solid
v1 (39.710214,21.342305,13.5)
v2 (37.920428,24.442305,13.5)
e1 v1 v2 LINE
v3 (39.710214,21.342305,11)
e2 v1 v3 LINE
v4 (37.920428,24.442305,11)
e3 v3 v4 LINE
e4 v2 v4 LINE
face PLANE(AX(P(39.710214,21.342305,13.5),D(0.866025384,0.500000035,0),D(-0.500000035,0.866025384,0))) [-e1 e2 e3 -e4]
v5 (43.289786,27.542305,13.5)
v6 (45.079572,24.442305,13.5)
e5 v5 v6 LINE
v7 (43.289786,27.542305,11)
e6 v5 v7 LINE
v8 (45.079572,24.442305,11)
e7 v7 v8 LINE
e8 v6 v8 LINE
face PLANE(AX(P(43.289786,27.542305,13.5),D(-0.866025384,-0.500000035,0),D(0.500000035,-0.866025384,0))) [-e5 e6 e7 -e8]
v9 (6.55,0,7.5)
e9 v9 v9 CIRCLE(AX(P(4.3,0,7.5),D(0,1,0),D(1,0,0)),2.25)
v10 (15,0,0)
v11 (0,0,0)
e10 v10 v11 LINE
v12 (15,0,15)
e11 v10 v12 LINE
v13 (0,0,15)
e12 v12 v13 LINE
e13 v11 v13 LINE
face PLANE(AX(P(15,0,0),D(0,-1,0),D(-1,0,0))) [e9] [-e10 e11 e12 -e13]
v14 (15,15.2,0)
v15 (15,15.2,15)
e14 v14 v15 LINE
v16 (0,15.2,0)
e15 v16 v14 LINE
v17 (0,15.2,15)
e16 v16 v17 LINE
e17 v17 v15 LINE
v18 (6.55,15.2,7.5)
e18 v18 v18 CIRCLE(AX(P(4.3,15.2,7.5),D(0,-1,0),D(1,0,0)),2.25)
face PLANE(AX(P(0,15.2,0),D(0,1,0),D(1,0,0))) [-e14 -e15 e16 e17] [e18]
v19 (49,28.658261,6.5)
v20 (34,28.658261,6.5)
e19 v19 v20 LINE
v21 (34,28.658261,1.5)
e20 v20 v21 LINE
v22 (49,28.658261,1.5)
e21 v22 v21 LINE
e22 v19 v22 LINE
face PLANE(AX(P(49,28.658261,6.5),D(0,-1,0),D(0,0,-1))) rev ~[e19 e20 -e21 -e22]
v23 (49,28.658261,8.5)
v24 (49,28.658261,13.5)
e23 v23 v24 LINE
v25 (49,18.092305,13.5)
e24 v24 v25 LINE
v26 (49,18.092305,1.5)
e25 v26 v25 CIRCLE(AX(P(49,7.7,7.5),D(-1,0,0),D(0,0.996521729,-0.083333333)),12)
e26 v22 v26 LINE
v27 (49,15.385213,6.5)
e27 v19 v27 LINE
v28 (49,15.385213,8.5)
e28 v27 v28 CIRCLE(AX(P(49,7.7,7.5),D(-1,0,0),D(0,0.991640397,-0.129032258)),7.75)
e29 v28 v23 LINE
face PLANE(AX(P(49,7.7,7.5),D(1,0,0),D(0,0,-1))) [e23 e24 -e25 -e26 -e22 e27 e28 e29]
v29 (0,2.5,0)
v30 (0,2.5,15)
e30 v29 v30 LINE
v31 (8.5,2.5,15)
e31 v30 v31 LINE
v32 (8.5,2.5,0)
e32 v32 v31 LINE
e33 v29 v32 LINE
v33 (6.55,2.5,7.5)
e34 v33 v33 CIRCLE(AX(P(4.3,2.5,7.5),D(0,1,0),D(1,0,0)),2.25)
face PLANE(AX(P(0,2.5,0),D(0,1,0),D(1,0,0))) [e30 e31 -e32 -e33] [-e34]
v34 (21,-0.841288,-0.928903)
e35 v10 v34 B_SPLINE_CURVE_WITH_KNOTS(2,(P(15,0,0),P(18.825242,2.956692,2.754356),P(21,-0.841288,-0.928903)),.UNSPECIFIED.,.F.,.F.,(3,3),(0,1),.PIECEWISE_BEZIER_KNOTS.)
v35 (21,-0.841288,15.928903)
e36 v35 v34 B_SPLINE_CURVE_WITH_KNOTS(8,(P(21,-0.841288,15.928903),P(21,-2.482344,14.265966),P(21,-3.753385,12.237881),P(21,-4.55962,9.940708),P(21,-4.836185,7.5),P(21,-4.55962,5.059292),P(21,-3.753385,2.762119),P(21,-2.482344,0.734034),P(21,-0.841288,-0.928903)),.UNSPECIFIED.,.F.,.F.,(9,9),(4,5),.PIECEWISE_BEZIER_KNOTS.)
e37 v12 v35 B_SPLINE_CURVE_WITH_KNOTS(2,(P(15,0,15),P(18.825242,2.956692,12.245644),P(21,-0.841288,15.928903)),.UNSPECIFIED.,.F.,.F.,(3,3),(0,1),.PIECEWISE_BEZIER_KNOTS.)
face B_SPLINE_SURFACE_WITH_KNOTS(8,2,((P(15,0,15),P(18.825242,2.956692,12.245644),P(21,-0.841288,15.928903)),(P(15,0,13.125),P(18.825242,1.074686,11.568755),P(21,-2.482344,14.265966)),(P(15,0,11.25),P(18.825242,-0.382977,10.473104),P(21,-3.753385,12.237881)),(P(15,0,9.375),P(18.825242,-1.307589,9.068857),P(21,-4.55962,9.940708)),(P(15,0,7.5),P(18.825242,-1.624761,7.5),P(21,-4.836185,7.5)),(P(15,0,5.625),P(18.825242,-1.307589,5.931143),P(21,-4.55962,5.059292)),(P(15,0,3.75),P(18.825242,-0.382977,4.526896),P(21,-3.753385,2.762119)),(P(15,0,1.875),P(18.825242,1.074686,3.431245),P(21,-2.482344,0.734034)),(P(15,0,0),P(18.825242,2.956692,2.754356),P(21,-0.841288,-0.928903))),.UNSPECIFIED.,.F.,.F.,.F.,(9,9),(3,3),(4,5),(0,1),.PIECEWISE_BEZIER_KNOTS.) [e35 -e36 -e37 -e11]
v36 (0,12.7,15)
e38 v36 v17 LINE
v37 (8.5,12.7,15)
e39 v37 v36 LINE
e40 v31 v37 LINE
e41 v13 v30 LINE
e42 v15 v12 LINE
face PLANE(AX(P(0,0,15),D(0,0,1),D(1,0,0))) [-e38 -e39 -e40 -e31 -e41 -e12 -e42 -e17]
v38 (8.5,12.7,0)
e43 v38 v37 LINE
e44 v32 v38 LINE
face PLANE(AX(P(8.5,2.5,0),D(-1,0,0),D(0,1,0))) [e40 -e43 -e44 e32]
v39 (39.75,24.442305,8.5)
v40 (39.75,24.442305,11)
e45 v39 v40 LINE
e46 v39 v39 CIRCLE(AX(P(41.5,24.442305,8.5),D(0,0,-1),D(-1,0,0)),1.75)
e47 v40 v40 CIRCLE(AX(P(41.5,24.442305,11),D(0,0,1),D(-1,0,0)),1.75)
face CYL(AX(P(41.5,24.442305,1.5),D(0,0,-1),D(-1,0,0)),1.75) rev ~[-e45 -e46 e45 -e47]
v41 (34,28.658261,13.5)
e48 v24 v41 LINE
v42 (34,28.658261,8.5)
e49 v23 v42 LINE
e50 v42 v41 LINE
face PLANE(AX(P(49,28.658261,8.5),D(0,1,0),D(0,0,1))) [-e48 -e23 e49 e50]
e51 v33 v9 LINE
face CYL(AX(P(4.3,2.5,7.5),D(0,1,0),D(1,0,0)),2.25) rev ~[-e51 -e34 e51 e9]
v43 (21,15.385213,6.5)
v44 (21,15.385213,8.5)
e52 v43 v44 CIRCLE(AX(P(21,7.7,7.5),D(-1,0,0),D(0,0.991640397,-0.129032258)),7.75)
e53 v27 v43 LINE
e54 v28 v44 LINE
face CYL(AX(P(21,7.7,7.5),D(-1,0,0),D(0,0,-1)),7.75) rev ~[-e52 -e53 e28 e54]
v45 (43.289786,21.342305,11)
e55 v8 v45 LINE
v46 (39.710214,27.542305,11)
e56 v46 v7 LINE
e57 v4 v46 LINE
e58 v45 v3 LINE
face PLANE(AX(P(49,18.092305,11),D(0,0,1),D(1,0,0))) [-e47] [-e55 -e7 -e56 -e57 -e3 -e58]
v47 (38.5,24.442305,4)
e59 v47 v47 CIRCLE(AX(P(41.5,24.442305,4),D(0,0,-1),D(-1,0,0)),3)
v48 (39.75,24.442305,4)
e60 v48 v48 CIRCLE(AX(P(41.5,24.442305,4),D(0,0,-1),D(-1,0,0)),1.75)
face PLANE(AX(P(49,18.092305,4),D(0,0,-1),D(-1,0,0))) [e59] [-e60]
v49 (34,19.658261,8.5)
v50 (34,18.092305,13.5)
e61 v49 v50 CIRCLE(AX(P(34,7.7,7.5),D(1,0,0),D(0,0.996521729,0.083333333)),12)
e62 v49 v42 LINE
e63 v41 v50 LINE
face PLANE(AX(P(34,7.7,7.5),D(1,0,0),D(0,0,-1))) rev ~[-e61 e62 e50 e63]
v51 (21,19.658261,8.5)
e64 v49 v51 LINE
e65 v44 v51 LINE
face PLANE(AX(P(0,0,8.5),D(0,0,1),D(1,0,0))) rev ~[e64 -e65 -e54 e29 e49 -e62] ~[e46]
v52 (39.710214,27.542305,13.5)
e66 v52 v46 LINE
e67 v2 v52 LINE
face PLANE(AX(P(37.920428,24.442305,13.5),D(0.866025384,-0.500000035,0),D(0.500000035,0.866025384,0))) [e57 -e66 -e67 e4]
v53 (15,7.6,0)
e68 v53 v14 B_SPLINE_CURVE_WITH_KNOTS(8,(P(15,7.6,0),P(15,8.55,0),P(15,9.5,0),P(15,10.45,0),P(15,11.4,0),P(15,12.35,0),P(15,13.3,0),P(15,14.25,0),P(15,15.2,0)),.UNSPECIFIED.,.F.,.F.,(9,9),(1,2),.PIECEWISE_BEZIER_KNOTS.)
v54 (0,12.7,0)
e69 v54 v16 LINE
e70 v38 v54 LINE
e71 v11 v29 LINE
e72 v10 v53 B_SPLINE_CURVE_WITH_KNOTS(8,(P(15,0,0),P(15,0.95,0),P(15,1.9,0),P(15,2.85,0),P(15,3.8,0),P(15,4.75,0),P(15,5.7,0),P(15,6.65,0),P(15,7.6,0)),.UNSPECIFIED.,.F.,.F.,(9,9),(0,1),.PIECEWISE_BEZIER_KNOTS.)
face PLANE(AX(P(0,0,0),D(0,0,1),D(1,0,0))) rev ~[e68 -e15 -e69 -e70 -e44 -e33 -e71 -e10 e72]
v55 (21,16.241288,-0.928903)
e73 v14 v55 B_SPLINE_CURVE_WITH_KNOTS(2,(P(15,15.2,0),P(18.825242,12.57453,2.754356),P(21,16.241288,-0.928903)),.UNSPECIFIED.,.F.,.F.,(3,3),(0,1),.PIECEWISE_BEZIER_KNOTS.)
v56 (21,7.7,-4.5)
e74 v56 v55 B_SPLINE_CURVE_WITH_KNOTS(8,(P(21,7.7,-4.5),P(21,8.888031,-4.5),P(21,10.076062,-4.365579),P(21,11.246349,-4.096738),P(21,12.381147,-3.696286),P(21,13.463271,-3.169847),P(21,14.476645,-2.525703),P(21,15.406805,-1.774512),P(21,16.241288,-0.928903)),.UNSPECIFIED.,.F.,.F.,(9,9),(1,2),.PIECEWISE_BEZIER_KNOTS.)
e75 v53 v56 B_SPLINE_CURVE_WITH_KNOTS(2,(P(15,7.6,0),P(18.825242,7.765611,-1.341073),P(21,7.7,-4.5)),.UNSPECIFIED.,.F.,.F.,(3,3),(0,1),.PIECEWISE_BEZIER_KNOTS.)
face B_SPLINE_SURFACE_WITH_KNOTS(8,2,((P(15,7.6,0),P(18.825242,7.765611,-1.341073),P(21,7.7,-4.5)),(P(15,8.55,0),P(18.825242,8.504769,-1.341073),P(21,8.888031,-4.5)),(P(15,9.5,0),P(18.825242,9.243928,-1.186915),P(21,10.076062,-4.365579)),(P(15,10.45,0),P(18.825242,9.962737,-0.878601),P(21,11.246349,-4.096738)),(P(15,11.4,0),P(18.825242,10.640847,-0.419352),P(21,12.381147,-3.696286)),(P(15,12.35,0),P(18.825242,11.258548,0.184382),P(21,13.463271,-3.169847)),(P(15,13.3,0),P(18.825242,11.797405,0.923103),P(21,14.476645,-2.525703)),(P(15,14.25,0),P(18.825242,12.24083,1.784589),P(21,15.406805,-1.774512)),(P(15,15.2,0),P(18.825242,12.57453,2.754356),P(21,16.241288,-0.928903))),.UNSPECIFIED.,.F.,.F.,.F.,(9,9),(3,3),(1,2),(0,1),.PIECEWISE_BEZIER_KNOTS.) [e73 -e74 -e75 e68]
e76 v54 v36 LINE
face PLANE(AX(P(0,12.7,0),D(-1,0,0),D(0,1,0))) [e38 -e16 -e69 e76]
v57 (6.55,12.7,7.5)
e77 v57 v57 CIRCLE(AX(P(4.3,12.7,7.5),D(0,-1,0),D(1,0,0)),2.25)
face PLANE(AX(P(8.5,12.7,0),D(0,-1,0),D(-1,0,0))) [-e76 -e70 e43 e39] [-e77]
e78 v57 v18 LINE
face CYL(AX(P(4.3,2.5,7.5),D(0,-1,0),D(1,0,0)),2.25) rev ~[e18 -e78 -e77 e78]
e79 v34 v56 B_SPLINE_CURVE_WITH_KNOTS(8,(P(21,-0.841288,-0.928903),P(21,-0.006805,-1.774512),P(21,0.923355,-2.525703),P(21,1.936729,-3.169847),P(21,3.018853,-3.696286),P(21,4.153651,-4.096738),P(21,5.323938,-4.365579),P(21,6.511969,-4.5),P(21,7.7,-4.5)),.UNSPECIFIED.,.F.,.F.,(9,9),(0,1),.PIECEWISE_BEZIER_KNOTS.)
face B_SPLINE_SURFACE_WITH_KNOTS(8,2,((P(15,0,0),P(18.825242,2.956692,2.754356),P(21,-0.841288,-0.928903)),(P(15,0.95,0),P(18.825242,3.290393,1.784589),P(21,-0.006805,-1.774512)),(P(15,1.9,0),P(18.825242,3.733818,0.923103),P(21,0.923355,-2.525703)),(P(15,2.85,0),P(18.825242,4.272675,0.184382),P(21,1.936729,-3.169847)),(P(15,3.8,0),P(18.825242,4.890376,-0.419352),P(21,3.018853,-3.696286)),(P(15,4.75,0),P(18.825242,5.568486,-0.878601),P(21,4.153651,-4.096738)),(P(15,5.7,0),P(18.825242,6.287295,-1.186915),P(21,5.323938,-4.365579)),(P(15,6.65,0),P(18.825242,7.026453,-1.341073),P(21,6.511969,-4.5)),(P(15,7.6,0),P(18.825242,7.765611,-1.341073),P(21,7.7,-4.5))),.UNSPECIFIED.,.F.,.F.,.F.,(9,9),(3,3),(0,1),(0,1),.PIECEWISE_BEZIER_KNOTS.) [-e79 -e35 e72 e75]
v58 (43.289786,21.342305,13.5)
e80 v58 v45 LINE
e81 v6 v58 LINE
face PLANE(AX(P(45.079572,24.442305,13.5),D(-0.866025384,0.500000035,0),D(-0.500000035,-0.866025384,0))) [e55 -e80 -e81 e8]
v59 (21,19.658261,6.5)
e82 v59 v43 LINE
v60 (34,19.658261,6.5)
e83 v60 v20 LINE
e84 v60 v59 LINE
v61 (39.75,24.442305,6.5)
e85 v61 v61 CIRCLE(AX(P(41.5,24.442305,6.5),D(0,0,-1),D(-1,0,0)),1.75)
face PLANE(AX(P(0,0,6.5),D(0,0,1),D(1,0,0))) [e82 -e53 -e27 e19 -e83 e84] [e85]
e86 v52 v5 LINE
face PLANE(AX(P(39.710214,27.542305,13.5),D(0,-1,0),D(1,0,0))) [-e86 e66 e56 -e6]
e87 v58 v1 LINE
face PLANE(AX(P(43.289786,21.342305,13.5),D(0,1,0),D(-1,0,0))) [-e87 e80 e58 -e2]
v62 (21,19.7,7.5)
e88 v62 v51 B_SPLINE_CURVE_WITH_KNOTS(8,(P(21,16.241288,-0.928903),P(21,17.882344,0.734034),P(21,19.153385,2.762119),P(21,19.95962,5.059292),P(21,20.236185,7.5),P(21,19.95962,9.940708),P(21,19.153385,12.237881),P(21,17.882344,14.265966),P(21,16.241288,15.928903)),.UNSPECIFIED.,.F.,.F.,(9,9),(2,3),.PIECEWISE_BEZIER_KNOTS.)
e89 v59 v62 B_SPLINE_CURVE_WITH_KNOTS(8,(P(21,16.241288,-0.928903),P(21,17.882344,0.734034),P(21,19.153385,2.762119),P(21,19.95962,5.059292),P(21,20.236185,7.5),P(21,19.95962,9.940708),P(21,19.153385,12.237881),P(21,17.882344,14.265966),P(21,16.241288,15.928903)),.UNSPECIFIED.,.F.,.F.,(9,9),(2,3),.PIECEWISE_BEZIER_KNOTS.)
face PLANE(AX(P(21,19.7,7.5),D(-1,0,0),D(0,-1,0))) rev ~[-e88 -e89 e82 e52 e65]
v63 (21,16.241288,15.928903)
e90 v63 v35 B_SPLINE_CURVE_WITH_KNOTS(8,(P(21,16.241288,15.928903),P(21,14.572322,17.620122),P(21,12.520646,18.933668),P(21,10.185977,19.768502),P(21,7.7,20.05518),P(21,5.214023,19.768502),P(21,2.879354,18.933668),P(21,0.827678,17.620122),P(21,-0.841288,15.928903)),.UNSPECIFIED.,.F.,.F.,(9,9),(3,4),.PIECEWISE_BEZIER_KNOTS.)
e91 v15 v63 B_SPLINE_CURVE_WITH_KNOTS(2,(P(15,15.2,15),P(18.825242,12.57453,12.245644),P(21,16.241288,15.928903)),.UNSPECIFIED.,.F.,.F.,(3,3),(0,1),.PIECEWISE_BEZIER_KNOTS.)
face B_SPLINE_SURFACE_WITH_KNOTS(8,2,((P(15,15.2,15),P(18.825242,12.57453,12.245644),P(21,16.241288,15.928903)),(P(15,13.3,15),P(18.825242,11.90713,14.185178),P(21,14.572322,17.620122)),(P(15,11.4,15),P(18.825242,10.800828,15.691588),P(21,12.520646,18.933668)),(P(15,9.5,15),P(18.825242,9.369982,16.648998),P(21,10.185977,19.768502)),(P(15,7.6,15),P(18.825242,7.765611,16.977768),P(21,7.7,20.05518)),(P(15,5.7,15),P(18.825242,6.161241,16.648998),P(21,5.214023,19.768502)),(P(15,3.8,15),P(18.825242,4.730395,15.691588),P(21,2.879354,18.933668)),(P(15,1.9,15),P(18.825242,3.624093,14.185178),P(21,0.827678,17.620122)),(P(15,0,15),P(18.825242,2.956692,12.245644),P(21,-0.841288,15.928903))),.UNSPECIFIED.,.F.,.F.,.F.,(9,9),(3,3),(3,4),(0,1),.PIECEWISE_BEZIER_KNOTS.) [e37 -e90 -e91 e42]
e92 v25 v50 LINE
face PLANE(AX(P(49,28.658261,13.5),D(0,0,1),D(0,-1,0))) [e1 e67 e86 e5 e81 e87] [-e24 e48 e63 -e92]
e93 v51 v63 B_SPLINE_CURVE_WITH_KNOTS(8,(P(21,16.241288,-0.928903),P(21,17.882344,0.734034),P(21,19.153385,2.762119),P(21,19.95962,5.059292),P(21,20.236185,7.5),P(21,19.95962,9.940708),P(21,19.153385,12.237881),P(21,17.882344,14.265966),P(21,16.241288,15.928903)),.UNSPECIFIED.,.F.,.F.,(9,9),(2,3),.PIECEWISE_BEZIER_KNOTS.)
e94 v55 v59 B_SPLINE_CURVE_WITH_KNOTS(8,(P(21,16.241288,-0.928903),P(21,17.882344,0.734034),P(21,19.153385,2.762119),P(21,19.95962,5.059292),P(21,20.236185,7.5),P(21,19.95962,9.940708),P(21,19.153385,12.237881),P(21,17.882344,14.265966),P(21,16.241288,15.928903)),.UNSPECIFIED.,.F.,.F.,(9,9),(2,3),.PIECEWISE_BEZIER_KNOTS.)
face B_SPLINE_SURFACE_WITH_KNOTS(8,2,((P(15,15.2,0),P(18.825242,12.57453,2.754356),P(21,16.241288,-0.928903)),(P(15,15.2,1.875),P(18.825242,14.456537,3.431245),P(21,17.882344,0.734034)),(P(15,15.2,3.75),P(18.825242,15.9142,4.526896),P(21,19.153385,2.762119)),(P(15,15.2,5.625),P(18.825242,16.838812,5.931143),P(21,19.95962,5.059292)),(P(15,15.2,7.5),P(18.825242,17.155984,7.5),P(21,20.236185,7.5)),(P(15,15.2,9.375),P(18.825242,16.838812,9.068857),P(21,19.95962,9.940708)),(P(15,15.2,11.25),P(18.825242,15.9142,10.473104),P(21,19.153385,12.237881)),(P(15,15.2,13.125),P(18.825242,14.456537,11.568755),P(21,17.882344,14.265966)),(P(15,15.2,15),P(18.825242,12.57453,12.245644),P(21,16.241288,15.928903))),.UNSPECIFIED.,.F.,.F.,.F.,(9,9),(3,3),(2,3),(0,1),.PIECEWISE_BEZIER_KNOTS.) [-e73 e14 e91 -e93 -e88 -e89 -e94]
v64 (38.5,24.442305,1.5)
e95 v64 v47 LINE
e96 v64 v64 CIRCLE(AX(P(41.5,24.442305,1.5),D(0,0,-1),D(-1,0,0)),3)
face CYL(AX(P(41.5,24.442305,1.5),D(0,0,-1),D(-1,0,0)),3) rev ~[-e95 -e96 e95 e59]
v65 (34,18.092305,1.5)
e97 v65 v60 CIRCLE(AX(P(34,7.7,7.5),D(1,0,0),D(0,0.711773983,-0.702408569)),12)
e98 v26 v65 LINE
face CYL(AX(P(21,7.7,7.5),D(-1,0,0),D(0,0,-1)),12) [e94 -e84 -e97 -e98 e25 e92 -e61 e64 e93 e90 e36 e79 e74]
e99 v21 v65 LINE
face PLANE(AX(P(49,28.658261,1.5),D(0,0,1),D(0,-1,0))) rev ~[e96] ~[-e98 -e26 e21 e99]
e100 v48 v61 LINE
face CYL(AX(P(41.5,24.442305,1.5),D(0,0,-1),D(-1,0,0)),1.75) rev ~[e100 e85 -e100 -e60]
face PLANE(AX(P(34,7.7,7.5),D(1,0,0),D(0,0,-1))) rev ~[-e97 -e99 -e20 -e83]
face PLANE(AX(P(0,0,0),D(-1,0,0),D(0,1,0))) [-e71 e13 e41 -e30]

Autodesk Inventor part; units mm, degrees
ref_plane "YZ Plane" through (0, 0, 0) normal (1, 0, 0) x (0, 1, 0)
sketch "Sketch1" plane through (0, 0, 0) normal (0, 0, 1) x (1, 0, 0)
  line L0 (0, 0) -> (0, 2.5)
  line L1 (0, 2.5) -> (8.5, 2.5)
  line L2 (8.5, 2.5) -> (8.5, 12.7)
  line L3 (8.5, 12.7) -> (0, 12.7)
  line L4 (0, 12.7) -> (0, 15.2)
  line L5 (0, 15.2) -> (15, 15.2)
  line L6 (15, 15.2) -> (15, 0)
  line L7 (15, 0) -> (0, 0)
  dimension "d0" = 2.5
  dimension "d1" = 8.5
  dimension "d2" = 10.2
  dimension "d3" = 2.5
  dimension "d4" = 15
extrude "Extrusion1" add sketch "Sketch1" along normal blind 15
ref_plane "Work Plane1" through (18, 0, 0) normal (1, 0, 0) x (0, 0, -1)
sketch "Sketch3" plane through (15, 0, 0) normal (1, 0, 0) x (0, 0, -1)
  line L0 (0, 15.2) -> (-15, 15.2) projected
  line L1 (-15, 15.2) -> (0, 15.2)
  line L2 (0, 0) -> (-15, 0) projected
  line L3 (0, 15.2) -> (0, 0)
  line L4 (-15, 2.5) -> (-15, 0) projected
  line L5 (0, 0) -> (-15, 0)
  line L6 (-15, 15.2) -> (-15, 12.7) projected
  line L7 (-15, 0) -> (-15, 15.2)
sketch "Sketch4" plane through (18, 0, 0) normal (1, 0, 0) x (0, 0, -1)
  circle A0 centre (-7.5, 7.7) radius 9
  line L0 (0, 15.2) -> (-15, 15.2) projected
  line L1 (-15, 0) -> (-15, 15.2) projected
  point P0 (0, 0)
  dimension "d10" = 18
  dimension "d11" = 7.5
  dimension "d12" = 7.5
ref_plane "Work Plane2" through (21, 7.7, 7.5) normal (1, 0, 0) x (0, 0, -1)
sketch "Sketch5" plane through (21, 7.7, 7.5) normal (1, 0, 0) x (0, 0, -1)
  circle A0 centre (0, 0) radius 12
  point P0 (7.5, -7.7)
  dimension "d18" = 24
sketch "Sketch4 outline for Loft2" plane through (18, 0, 0) normal (1, 0, 0) x (0, 0, -1)
  circle A0 centre (-7.5, 7.7) radius 9
sketch "Sketch5 outline for Loft2" plane through (21, 7.7, 7.5) normal (1, 0, 0) x (0, 0, -1)
  circle A0 centre (0, 0) radius 12
loft "Loft2" add profiles "Sketch4 outline for Loft2", "Sketch5 outline for Loft2" section 1 edges at (15, 7.6, 0) (15, 15.2, 7.5) (15, 7.6, 15) (15, 0, 7.5)
sketch "Sketch6" plane through (21, 7.7, 7.5) normal (1, 0, 0) x (0, 0, -1)
  circle A0 centre (0, 0) radius 7.75
  circle A1 centre (0, 0) radius 12
  point P0 (7.5, -7.7)
  dimension "d25" = 15.5
extrude "Extrusion2" add sketch "Sketch6" along normal blind 28
ref_plane "Work Plane3" through (0, 0, 7.5) normal (0, 0, 1) x (1, 0, 0)
sketch "Sketch7" plane through (0, 0, 7.5) normal (0, 0, 1) x (1, 0, 0)
  line L0 (21, 19.7) -> (49, 19.7)
  line L1 (49, 19.7) -> (21, 19.7)
  line L2 (21, 16.241288) -> (21, -0.841288)
  line L3 (21, 15.217594) -> (49, 15.217594)
  line L4 (49, -4.3) -> (49, 19.7)
  line L5 (49, 15.217594) -> (49, 19.7)
  line L6 (21, 19.7) -> (21, 16.241288)
  line L7 (21, 19.7) -> (21, 15.217594)
  point P0 (0, 0)
extrude "Extrusion3" cut sketch "Sketch7" against normal mid plane 2
sketch "Sketch8" plane through (49, 7.7, 7.5) normal (1, 0, 0) x (0, 0, -1)
  point P0 (7.5, -7.7)
sketch "Sketch10" plane through (49, 7.7, 7.5) normal (1, 0, 0) x (0, 0, -1)
  arc A0 (-1, 11.958261) -> (-8.428903, 8.541288) centre (0, 0) ccw
  line L0 (-1, 11.958261) -> (-1, 20.958261)
  line L1 (-1, 20.958261) -> (-6, 20.958261)
  line L2 (-6, 20.958261) -> (-6, 10.392305)
  arc A1 (8.428903, 8.541288) -> (1, 11.958261) centre (0, 0) ccw
  line L3 (1, 11.958261) -> (1, 20.958261)
  line L4 (1, 20.958261) -> (6, 20.958261)
  line L5 (6, 20.958261) -> (6, 10.392305)
  arc A2 (-1, 11.958261) -> (-6, 10.392305) centre (0, 0) ccw
  line L6 (1, 7.685213) -> (1, 11.958261)
  arc A3 (6, 10.392305) -> (1, 11.958261) centre (0, 0) ccw
  point P0 (7.5, -7.7)
  dimension "d33" = 9
  dimension "d34" = 5
  dimension "d35" = 5
extrude "Extrusion4" add sketch "Sketch10" against normal blind 15
sketch "Sketch11" plane through (49, 18.092305, 1.5) normal (0, 0, -1) x (-1, 0, 0)
  circle A0 centre (7.5, 6.35) radius 1.75
  point P0 (49, -18.092305)
  dimension "d38" = 3.5
extrude "Extrusion5" cut sketch "Sketch11" against normal through all
sketch "Sketch12" plane through (49, 18.092305, 1.5) normal (0, 0, -1) x (-1, 0, 0)
  circle A0 centre (7.5, 6.35) radius 1.75 projected
  circle A1 centre (7.5, 6.35) radius 3
  point P0 (49, -18.092305)
  dimension "d41" = 6
extrude "Extrusion6" cut sketch "Sketch12" against normal blind 2.5 contours A0 | A1
sketch "Sketch13" plane through (0, 0, 8.5) normal (0, 0, -1) x (-1, 0, 0)
  point P0 (0, 0)
sketch "Sketch14" plane through (49, 18.092305, 13.5) normal (0, 0, 1) x (1, 0, 0)
  circle A0 centre (-7.5, 6.35) radius 1.75
  line L0 (-3.920428, 6.35) -> (-5.710214, 3.25)
  line L1 (-5.710214, 3.25) -> (-9.289786, 3.25)
  line L2 (-9.289786, 3.25) -> (-11.079572, 6.35)
  line L3 (-11.079572, 6.35) -> (-9.289786, 9.45)
  line L4 (-9.289786, 9.45) -> (-5.710214, 9.45)
  line L5 (-5.710214, 9.45) -> (-3.920428, 6.35)
  point P0 (-49, -18.092305)
  dimension "d44" = 6.2
extrude "Extrusion7" cut sketch "Sketch14" against normal blind 2.5
sketch "Sketch15" plane through (0, 2.5, 0) normal (0, 1, 0) x (1, 0, 0)
  circle A0 centre (4.3, -7.5) radius 2.25
  line L0 (8.5, 0) -> (8.5, -15) projected
  point P0 (0, 0)
  dimension "d47" = 4.5
  dimension "d48" = 4.2
extrude "Extrusion8" cut sketch "Sketch15" along normal through all both and the other way through all
properties part number "Arm connection"
